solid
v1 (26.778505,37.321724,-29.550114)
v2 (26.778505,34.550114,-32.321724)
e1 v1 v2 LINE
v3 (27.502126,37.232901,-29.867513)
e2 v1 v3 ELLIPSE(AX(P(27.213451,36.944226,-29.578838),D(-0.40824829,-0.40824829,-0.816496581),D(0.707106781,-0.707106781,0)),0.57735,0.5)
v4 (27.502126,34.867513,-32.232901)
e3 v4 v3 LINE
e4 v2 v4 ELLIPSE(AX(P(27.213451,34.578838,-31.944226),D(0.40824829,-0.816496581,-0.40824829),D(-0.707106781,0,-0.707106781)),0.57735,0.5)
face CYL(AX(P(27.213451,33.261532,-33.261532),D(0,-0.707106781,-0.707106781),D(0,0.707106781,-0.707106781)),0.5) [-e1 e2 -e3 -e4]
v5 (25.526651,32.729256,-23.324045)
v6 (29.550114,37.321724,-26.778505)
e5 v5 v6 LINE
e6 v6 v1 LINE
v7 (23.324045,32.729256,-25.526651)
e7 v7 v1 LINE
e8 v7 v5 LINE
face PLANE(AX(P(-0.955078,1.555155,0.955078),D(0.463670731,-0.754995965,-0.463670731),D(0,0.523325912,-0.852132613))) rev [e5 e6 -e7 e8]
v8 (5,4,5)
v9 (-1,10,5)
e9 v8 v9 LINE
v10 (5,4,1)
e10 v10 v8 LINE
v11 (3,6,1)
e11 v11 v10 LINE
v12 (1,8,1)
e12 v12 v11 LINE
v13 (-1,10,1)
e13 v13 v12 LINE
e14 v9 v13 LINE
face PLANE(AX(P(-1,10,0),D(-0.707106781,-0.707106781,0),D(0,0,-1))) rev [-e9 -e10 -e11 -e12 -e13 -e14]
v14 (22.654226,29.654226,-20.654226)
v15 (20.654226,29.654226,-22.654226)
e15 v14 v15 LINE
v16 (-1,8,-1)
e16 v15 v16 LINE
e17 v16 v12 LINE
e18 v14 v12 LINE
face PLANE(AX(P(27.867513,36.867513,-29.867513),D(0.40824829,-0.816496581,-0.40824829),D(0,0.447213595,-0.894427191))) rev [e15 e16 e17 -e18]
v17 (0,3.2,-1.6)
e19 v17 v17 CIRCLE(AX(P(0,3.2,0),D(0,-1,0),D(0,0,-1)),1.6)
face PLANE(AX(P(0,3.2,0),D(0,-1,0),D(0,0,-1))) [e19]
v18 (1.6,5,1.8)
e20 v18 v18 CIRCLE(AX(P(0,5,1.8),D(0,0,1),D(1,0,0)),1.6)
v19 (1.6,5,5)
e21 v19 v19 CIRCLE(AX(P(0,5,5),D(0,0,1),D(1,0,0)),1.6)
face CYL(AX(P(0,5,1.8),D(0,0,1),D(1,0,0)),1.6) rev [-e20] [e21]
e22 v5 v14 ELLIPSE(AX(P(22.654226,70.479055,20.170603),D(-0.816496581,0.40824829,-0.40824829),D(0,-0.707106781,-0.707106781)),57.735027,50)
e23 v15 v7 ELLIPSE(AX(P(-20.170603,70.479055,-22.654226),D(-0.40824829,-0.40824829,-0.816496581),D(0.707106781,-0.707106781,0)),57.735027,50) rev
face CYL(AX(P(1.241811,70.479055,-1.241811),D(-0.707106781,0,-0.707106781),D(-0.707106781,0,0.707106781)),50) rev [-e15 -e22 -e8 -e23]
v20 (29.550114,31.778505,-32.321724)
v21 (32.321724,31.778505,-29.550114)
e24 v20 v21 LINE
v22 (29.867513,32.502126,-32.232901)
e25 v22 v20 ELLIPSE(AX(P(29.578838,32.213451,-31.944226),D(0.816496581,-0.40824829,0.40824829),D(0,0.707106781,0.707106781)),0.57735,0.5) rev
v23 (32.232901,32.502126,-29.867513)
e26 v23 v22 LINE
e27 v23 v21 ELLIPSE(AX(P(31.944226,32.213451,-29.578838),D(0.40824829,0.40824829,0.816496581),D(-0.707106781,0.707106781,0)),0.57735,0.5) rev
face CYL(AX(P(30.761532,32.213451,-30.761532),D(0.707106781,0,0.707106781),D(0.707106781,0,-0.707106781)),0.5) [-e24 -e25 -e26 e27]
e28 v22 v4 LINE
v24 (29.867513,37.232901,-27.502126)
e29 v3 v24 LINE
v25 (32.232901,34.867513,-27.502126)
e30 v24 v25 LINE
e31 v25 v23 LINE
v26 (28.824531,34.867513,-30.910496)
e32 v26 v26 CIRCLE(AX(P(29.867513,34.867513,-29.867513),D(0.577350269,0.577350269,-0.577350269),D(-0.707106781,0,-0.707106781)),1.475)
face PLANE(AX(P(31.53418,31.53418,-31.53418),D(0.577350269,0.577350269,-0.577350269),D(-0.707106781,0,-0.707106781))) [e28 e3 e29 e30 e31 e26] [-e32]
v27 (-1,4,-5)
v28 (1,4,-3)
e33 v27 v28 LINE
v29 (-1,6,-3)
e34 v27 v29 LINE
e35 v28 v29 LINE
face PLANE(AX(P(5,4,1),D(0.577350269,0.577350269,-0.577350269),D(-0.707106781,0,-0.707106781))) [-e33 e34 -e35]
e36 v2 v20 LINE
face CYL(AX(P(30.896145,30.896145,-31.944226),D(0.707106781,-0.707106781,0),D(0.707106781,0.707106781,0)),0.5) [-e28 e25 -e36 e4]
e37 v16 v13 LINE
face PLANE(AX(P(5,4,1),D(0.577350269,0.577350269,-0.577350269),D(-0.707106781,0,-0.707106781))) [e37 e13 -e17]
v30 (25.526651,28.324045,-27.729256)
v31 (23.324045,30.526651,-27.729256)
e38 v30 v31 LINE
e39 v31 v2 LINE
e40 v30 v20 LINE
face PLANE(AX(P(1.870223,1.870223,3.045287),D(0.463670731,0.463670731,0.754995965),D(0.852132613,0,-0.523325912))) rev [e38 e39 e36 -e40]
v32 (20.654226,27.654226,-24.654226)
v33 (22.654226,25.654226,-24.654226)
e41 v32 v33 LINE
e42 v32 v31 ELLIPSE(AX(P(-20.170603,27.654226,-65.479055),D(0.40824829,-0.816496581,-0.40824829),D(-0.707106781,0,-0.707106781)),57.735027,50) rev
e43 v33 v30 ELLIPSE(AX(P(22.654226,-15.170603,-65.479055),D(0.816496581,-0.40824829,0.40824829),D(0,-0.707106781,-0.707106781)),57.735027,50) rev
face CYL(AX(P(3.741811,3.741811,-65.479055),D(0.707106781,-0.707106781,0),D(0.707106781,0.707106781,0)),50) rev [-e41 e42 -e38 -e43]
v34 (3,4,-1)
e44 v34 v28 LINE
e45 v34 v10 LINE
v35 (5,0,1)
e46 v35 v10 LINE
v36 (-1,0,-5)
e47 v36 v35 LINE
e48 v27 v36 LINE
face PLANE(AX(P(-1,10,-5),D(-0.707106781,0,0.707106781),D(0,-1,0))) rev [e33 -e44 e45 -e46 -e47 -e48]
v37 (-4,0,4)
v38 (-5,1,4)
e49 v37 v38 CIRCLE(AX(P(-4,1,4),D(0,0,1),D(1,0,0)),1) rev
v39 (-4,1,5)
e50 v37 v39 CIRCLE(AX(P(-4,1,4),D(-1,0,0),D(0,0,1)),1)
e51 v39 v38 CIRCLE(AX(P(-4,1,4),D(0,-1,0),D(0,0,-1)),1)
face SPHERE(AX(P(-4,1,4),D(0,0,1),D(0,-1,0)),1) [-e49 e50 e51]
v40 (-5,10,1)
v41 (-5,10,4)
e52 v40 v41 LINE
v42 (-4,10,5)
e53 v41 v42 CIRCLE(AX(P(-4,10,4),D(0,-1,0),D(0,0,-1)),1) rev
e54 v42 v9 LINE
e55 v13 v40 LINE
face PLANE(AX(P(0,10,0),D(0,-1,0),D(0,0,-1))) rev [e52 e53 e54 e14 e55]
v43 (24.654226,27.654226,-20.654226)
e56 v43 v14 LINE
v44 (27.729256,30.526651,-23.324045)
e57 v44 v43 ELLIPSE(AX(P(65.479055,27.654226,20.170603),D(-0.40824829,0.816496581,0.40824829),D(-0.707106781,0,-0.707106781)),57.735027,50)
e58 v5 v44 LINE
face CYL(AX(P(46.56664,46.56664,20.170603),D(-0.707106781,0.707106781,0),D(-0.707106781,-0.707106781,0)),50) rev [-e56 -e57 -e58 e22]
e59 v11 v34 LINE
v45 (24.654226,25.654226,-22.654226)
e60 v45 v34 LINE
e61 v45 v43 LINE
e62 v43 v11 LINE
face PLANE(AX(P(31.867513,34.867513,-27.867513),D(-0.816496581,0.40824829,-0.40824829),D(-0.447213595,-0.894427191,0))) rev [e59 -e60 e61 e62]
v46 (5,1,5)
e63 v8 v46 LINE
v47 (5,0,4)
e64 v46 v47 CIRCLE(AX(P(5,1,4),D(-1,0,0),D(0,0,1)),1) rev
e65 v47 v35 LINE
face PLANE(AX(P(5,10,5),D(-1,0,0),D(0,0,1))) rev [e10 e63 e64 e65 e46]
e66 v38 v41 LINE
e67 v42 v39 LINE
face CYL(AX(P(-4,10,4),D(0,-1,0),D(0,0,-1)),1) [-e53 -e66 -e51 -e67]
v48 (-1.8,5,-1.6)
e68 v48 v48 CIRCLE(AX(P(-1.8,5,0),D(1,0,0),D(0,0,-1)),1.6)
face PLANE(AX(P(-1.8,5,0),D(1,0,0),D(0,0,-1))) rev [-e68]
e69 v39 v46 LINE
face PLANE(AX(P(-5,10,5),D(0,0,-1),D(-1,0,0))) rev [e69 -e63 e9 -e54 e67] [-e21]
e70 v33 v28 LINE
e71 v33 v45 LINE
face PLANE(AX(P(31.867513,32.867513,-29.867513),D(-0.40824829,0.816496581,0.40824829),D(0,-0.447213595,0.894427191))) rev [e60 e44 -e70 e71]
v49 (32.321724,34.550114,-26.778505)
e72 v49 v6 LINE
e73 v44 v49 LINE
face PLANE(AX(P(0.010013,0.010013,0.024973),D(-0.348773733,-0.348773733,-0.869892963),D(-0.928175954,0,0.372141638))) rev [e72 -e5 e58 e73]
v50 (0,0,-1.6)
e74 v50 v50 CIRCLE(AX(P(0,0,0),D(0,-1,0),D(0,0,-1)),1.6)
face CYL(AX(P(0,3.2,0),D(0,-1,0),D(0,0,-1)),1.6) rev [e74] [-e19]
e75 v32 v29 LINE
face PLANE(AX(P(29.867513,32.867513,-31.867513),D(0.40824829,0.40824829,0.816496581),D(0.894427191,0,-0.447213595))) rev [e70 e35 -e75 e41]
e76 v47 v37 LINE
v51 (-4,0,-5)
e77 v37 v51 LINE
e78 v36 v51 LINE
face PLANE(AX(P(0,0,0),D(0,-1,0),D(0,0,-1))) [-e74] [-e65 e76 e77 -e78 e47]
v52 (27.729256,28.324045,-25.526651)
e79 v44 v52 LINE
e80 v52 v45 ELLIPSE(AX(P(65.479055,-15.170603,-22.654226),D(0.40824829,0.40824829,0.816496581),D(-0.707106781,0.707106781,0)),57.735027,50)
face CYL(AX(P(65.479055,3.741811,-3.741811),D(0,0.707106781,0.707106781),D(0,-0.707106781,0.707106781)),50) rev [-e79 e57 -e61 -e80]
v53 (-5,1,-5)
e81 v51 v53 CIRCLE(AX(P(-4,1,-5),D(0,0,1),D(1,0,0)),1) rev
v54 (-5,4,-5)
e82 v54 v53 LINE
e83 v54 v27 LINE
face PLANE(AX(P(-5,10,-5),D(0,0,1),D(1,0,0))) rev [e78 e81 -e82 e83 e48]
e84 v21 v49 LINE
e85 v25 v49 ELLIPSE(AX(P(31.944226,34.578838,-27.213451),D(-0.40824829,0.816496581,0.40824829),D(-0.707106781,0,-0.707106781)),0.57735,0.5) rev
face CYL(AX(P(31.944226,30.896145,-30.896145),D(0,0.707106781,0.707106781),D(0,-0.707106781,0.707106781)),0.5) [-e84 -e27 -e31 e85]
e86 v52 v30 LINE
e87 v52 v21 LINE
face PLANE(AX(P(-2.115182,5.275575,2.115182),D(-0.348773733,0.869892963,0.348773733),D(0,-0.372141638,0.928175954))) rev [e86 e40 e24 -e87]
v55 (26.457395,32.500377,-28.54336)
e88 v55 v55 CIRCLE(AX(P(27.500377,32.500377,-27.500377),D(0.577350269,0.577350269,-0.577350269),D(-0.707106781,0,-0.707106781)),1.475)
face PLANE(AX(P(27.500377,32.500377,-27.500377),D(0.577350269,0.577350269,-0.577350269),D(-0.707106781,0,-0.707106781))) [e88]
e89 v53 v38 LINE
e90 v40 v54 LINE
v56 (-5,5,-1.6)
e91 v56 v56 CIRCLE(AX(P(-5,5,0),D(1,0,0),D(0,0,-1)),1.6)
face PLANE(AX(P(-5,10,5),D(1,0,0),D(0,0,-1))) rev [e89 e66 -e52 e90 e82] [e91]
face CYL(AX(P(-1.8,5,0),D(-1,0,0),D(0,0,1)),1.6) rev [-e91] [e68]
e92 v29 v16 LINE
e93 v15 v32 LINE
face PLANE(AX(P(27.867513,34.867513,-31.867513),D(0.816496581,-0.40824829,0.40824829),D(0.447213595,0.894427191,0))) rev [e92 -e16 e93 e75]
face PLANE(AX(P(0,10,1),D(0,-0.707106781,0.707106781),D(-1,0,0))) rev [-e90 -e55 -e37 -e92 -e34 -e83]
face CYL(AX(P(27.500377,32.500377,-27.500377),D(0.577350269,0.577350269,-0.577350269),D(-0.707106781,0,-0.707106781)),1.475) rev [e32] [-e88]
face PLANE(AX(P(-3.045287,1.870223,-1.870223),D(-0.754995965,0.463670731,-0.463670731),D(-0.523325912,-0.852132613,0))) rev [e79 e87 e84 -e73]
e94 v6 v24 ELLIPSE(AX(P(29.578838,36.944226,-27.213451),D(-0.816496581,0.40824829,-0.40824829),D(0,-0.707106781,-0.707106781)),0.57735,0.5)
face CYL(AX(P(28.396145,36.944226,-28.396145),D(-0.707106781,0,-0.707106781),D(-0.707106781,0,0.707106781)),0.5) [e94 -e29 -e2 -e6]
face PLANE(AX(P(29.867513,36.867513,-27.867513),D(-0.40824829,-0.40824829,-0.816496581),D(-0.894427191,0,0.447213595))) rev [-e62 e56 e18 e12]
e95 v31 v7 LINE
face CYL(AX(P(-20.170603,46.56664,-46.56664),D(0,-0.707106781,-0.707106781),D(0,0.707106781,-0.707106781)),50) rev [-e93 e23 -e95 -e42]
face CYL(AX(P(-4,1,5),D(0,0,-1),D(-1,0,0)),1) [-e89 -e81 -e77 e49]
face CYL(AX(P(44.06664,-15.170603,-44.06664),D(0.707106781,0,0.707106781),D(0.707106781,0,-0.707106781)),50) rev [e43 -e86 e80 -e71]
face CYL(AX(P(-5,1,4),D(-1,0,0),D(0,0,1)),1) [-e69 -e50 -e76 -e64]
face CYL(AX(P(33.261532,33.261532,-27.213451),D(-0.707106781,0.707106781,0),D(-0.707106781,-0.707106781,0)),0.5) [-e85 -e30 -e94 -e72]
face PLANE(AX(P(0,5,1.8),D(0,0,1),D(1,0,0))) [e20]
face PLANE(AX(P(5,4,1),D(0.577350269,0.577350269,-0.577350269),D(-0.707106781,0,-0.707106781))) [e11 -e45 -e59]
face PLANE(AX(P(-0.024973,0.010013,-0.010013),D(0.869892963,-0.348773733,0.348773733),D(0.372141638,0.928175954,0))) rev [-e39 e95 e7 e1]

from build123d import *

# Parameters (mm, degrees)
SKETCH1_W           = 10
SKETCH1_H           = 10
BOSS_EXTRUDE1_DEPTH = 10
SKETCH2_R           = 1.6
CUT_EXTRUDE1_DEPTH  = 3.2
SKETCH3_R           = 1.6
CUT_EXTRUDE3_DEPTH  = 3.2
SKETCH4_R           = 1.6
CUT_EXTRUDE4_DEPTH  = 3.2
FILLET2_R           = 1
CHAMFER1_SIZE       = 6
BOSS_EXTRUDE2_DEPTH = 50
SKETCH6_R           = 1.475
CUT_EXTRUDE5_DEPTH  = 4.1
FILLET3_R           = 0.5
FILLET4_R           = 50


with BuildPart() as part:
    # Sketch1 → Boss-Extrude1 (new body)
    with BuildSketch(Plane(origin=(0, 0, 0), x_dir=(1, 0, 0), z_dir=(0, 1, 0))):
        Rectangle(SKETCH1_W, SKETCH1_H)
    extrude(amount=BOSS_EXTRUDE1_DEPTH)

    # Sketch2 → Cut-Extrude1 (cut)
    with BuildSketch(Plane.XY.offset(5)):
        with Locations((0, 5)):
            Circle(SKETCH2_R)
    extrude(amount=-CUT_EXTRUDE1_DEPTH, mode=Mode.SUBTRACT)

    # Sketch3 → Cut-Extrude3 (cut)
    with BuildSketch(Plane(origin=(0, 0, 0), x_dir=(-1, 0, 0), z_dir=(0, -1, 0))):
        with Locations(Location((0, 0, 0), (0, 0, 90))):
            Circle(SKETCH3_R)
    extrude(amount=-CUT_EXTRUDE3_DEPTH, mode=Mode.SUBTRACT)

    # Sketch4 → Cut-Extrude4 (cut)
    with BuildSketch(Plane(origin=(-5, 0, 0), x_dir=(0, 0, -1), z_dir=(1, 0, 0))):
        with Locations((0, 5)):
            Circle(SKETCH4_R)
    extrude(amount=CUT_EXTRUDE4_DEPTH, mode=Mode.SUBTRACT)

    # Fillet2
    fillet2_edges = [part.edges().sort_by_distance(p)[0] for p in [
        (0, 0, 5),
        (-5, 0, 0),
        (-5, 5, 5),
    ]]
    fillet(fillet2_edges, radius=FILLET2_R)

    # Chamfer1
    chamfer1_edges = [part.edges().sort_by_distance(p)[0] for p in [
        (5, 10, 0),
        (5, 5, -5),
        (0, 10, -5),
    ]]
    chamfer(chamfer1_edges, length=CHAMFER1_SIZE)

    # Sketch5 → Boss-Extrude2 (add)
    with BuildSketch(Plane(origin=(2.666666667, 2.666666667, -2.666666667), x_dir=(-0.4082482904638649, -0.4082482904638639, -0.8164965809277248), z_dir=(0.5773502691896257, 0.577350269189624, -0.5773502691896276))):
        Polygon((0.40824829, 4.949747468), (-2.041241452, 6.363961031), (-4.490731195, 4.949747468), (-4.490731195, 2.121320344), (-2.041241452, 0.707106781), (0.40824829, 2.121320344), align=None)
    extrude(amount=BOSS_EXTRUDE2_DEPTH)

    # Sketch13 → Loft3 section 0
    with BuildSketch(Plane(origin=(25.760677434, 25.760677434, -25.760677434), x_dir=(-0.8164965809277259, 0.4082482904638619, -0.4082482904638644), z_dir=(0.577350269189626, 0.577350269189624, -0.5773502691896274))):
        with BuildLine():
            Line((2.041241452, 6.363961031), (-0.40824829, 4.949747468))
            Line((-0.40824829, 4.949747468), (-0.40824829, 2.121320344))
            Line((-0.40824829, 2.121320344), (2.041241452, 0.707106781))
            Line((2.041241452, 0.707106781), (4.490731195, 2.121320344))
            Line((4.490731195, 2.121320344), (4.490731195, 4.949747468))
            Line((4.490731195, 4.949747468), (2.041241452, 6.363961031))
        make_face()
    # Sketch12 → Loft3 section 1
    with BuildSketch(Plane(origin=(31.534180126, 31.534180126, -31.534180126), x_dir=(-0.40824829046386485, -0.4082482904638636, -0.8164965809277249), z_dir=(0.577350269189626, 0.5773502691896241, -0.5773502691896275))):
        with BuildLine():
            Line((1.40824829, 1.543970074), (1.40824829, 5.527097737))
            Line((1.40824829, 5.527097737), (-2.041241452, 7.518661569))
            Line((-2.041241452, 7.518661569), (-5.490731195, 5.527097737))
            Line((-5.490731195, 5.527097737), (-5.490731195, 1.543970074))
            Line((-5.490731195, 1.543970074), (-2.041241452, -0.447593757))
            Line((-2.041241452, -0.447593757), (1.40824829, 1.543970074))
        make_face()
    loft()

    # Sketch6 → Cut-Extrude5 (cut)
    with BuildSketch(Plane(origin=(31.534180126, 31.534180126, -31.534180126), x_dir=(-0.40824829046386507, -0.4082482904638639, -0.8164965809277246), z_dir=(0.5773502691896257, 0.5773502691896238, -0.5773502691896278))):
        with Locations(Location((-2.041241452, 3.535533906, 0), (0, 0, 30))):
            Circle(SKETCH6_R)
    extrude(amount=-CUT_EXTRUDE5_DEPTH, mode=Mode.SUBTRACT)

    # Fillet3
    fillet3_edges = [part.edges().sort_by_distance(p)[0] for p in [
        (28.459265169, 37.68401004, -28.459265169),
        (31.27576175, 36.27576175, -27.051016879),
        (32.68401004, 33.459265169, -28.459265169),
        (31.27576175, 32.051016879, -31.27576175),
        (28.459265169, 33.459265169, -32.68401004),
        (27.051016879, 36.27576175, -31.27576175),
    ]]
    fillet(fillet3_edges, radius=FILLET3_R)

    # Fillet4
    # the kernel refuses this fillet: 50 mm, written as the material it adds along each edge
    with BuildSketch(Plane(origin=(30.502434506, 27.094010768, -19.685587029), x_dir=(0.6151072128065446, 0.49324054325118827, -0.6151072128065457), z_dir=(-0.7071067811865475, -1.8318679906315083e-15, -0.7071067811865477))) as fillet4_piece_1_section:
        with BuildLine():
            CenterArc((FILLET4_R * 0.0498756211209, FILLET4_R), FILLET4_R, 264.289406863, 5.710593137)
            Line((-FILLET4_R * 0.0496280979001, FILLET4_R * 0.00496280979001), (0, 0))
            Line((0, 0), (FILLET4_R * 0.0498756211209, 0))
        make_face()
    fillet4_piece_1 = extrude(amount=15.297332405, mode=Mode.PRIVATE)
    fillet4_piece_1 = fillet4_piece_1 - Plane(origin=(5.44602295, 2.037599211, -65.47905465), x_dir=(0.4636707308133369, 0.463670730813339, 0.7549959647402431), z_dir=(0.7071067811865475, -0.7071067811865478, 2.220446049250313e-15)) * Cylinder(50, 41, mode=Mode.PRIVATE)
    fillet4_piece_1 = fillet4_piece_1 - Plane(origin=(65.47905465, 7.44602295, -0.037599211), x_dir=(-0.7549959647402456, 0.4636707308133344, -0.46367073081333715), z_dir=(0, 0.7071067811865497, 0.7071067811865455)) * Cylinder(50, 41, mode=Mode.PRIVATE)
    add(fillet4_piece_1)
    with BuildSketch(Plane(origin=(26.094010768, 33.502434506, -17.685587029), x_dir=(0.6557294359916664, 0.5338627664363041, -0.5338627664363074), z_dir=(0, -0.7071067811865497, -0.7071067811865455))) as fillet4_piece_2_section:
        with BuildLine():
            CenterArc((FILLET4_R * 0.0498756211209, FILLET4_R), FILLET4_R, 264.289406863, 5.710593137)
            Line((-FILLET4_R * 0.0496280979001, FILLET4_R * 0.00496280979001), (0, 0))
            Line((0, 0), (FILLET4_R * 0.0498756211209, 0))
        make_face()
    fillet4_piece_2 = extrude(amount=15.297332405, mode=Mode.PRIVATE)
    fillet4_piece_2 = fillet4_piece_2 - Plane(origin=(42.862428257, 50.270851996, 20.170603443), x_dir=(-0.3487737328890522, -0.34877373288905417, -0.8698929626645284), z_dir=(-0.7071067811865471, 0.7071067811865479, -1.8596235662471372e-15)) * Cylinder(50, 41, mode=Mode.PRIVATE)
    fillet4_piece_2 = fillet4_piece_2 - Plane(origin=(48.270851996, -15.170603443, -39.862428257), x_dir=(-0.34877373288905117, 0.8698929626645311, 0.3487737328890489), z_dir=(0.7071067811865476, 1.831867990631508e-15, 0.7071067811865476)) * Cylinder(50, 41, mode=Mode.PRIVATE)
    add(fillet4_piece_2)
    with BuildSketch(Plane(origin=(19.685587029, 35.502434506, -22.094010768), x_dir=(0.6151072128065466, 0.6151072128065448, -0.49324054325118677), z_dir=(0.7071067811865472, -0.7071067811865479, 1.7763568394002505e-15))) as fillet4_piece_3_section:
        with BuildLine():
            CenterArc((FILLET4_R * 0.0498756211209, FILLET4_R), FILLET4_R, 264.289406863, 5.710593137)
            Line((-FILLET4_R * 0.0496280979001, FILLET4_R * 0.00496280979001), (0, 0))
            Line((0, 0), (FILLET4_R * 0.0498756211209, 0))
        make_face()
    fillet4_piece_3 = extrude(amount=15.297332405, mode=Mode.PRIVATE)
    fillet4_piece_3 = fillet4_piece_3 - Plane(origin=(0.037599211, 70.47905465, -2.44602295), x_dir=(0.46367073081333604, -0.7549959647402467, -0.4636707308133341), z_dir=(-0.7071067811865476, -1.6930901125533633e-15, -0.7071067811865477)) * Cylinder(50, 41, mode=Mode.PRIVATE)
    fillet4_piece_3 = fillet4_piece_3 - Plane(origin=(65.47905465, 10.44602295, 2.962400789), x_dir=(-0.7549959647402456, 0.4636707308133344, -0.46367073081333715), z_dir=(0, 0.7071067811865497, 0.7071067811865455)) * Cylinder(50, 41, mode=Mode.PRIVATE)
    add(fillet4_piece_3)
    with BuildSketch(Plane(origin=(17.685587029, 31.094010768, -28.502434506), x_dir=(0.533862766436308, 0.6557294359916612, -0.5338627664363096), z_dir=(0.7071067811865475, 1.7763568394002505e-15, 0.7071067811865476))) as fillet4_piece_4_section:
        with BuildLine():
            CenterArc((FILLET4_R * 0.0498756211209, FILLET4_R), FILLET4_R, 264.289406863, 5.710593137)
            Line((-FILLET4_R * 0.0496280979001, FILLET4_R * 0.00496280979001), (0, 0))
            Line((0, 0), (FILLET4_R * 0.0498756211209, 0))
        make_face()
    fillet4_piece_4 = extrude(amount=15.297332405, mode=Mode.PRIVATE)
    fillet4_piece_4 = fillet4_piece_4 - Plane(origin=(39.862428257, 53.270851996, 20.170603443), x_dir=(-0.3487737328890522, -0.34877373288905417, -0.8698929626645284), z_dir=(-0.7071067811865471, 0.7071067811865479, -1.8596235662471372e-15)) * Cylinder(50, 41, mode=Mode.PRIVATE)
    fillet4_piece_4 = fillet4_piece_4 - Plane(origin=(-20.170603443, 47.862428257, -45.270851996), x_dir=(0.8698929626645304, -0.34877373288904956, 0.3487737328890521), z_dir=(0, -0.7071067811865497, -0.7071067811865454)) * Cylinder(50, 41, mode=Mode.PRIVATE)
    add(fillet4_piece_4)
    with BuildSketch(Plane(origin=(28.502434506, 22.685587029, -26.094010768), x_dir=(0.5338627664363049, 0.5338627664363026, -0.6557294359916698), z_dir=(-0.7071067811865474, 0.7071067811865477, -2.220446049250313e-15))) as fillet4_piece_5_section:
        with BuildLine():
            CenterArc((FILLET4_R * 0.0498756211209, FILLET4_R), FILLET4_R, 264.289406863, 5.710593137)
            Line((-FILLET4_R * 0.0496280979001, FILLET4_R * 0.00496280979001), (0, 0))
            Line((0, 0), (FILLET4_R * 0.0498756211209, 0))
        make_face()
    fillet4_piece_5 = extrude(amount=15.297332405, mode=Mode.PRIVATE)
    fillet4_piece_5 = fillet4_piece_5 - Plane(origin=(45.270851996, -15.170603443, -42.862428257), x_dir=(-0.34877373288905117, 0.8698929626645311, 0.3487737328890489), z_dir=(0.7071067811865476, 1.831867990631508e-15, 0.7071067811865476)) * Cylinder(50, 41, mode=Mode.PRIVATE)
    fillet4_piece_5 = fillet4_piece_5 - Plane(origin=(-20.170603443, 44.862428257, -48.270851996), x_dir=(0.8698929626645304, -0.34877373288904956, 0.3487737328890521), z_dir=(0, -0.7071067811865497, -0.7071067811865454)) * Cylinder(50, 41, mode=Mode.PRIVATE)
    add(fillet4_piece_5)
    with BuildSketch(Plane(origin=(22.094010768, 24.685587029, -30.502434506), x_dir=(0.49324054325118744, 0.6151072128065436, -0.6151072128065473), z_dir=(0, 0.7071067811865498, 0.7071067811865454))) as fillet4_piece_6_section:
        with BuildLine():
            CenterArc((FILLET4_R * 0.0498756211209, FILLET4_R), FILLET4_R, 264.289406863, 5.710593137)
            Line((-FILLET4_R * 0.0496280979001, FILLET4_R * 0.00496280979001), (0, 0))
            Line((0, 0), (FILLET4_R * 0.0498756211209, 0))
        make_face()
    fillet4_piece_6 = extrude(amount=15.297332405, mode=Mode.PRIVATE)
    fillet4_piece_6 = fillet4_piece_6 - Plane(origin=(2.44602295, 5.037599211, -65.47905465), x_dir=(0.4636707308133369, 0.463670730813339, 0.7549959647402431), z_dir=(0.7071067811865475, -0.7071067811865478, 2.220446049250313e-15)) * Cylinder(50, 41, mode=Mode.PRIVATE)
    fillet4_piece_6 = fillet4_piece_6 - Plane(origin=(-2.962400789, 70.47905465, -5.44602295), x_dir=(0.46367073081333604, -0.7549959647402467, -0.4636707308133341), z_dir=(-0.7071067811865476, -1.6930901125533633e-15, -0.7071067811865477)) * Cylinder(50, 41, mode=Mode.PRIVATE)
    add(fillet4_piece_6)


solid = part.part
